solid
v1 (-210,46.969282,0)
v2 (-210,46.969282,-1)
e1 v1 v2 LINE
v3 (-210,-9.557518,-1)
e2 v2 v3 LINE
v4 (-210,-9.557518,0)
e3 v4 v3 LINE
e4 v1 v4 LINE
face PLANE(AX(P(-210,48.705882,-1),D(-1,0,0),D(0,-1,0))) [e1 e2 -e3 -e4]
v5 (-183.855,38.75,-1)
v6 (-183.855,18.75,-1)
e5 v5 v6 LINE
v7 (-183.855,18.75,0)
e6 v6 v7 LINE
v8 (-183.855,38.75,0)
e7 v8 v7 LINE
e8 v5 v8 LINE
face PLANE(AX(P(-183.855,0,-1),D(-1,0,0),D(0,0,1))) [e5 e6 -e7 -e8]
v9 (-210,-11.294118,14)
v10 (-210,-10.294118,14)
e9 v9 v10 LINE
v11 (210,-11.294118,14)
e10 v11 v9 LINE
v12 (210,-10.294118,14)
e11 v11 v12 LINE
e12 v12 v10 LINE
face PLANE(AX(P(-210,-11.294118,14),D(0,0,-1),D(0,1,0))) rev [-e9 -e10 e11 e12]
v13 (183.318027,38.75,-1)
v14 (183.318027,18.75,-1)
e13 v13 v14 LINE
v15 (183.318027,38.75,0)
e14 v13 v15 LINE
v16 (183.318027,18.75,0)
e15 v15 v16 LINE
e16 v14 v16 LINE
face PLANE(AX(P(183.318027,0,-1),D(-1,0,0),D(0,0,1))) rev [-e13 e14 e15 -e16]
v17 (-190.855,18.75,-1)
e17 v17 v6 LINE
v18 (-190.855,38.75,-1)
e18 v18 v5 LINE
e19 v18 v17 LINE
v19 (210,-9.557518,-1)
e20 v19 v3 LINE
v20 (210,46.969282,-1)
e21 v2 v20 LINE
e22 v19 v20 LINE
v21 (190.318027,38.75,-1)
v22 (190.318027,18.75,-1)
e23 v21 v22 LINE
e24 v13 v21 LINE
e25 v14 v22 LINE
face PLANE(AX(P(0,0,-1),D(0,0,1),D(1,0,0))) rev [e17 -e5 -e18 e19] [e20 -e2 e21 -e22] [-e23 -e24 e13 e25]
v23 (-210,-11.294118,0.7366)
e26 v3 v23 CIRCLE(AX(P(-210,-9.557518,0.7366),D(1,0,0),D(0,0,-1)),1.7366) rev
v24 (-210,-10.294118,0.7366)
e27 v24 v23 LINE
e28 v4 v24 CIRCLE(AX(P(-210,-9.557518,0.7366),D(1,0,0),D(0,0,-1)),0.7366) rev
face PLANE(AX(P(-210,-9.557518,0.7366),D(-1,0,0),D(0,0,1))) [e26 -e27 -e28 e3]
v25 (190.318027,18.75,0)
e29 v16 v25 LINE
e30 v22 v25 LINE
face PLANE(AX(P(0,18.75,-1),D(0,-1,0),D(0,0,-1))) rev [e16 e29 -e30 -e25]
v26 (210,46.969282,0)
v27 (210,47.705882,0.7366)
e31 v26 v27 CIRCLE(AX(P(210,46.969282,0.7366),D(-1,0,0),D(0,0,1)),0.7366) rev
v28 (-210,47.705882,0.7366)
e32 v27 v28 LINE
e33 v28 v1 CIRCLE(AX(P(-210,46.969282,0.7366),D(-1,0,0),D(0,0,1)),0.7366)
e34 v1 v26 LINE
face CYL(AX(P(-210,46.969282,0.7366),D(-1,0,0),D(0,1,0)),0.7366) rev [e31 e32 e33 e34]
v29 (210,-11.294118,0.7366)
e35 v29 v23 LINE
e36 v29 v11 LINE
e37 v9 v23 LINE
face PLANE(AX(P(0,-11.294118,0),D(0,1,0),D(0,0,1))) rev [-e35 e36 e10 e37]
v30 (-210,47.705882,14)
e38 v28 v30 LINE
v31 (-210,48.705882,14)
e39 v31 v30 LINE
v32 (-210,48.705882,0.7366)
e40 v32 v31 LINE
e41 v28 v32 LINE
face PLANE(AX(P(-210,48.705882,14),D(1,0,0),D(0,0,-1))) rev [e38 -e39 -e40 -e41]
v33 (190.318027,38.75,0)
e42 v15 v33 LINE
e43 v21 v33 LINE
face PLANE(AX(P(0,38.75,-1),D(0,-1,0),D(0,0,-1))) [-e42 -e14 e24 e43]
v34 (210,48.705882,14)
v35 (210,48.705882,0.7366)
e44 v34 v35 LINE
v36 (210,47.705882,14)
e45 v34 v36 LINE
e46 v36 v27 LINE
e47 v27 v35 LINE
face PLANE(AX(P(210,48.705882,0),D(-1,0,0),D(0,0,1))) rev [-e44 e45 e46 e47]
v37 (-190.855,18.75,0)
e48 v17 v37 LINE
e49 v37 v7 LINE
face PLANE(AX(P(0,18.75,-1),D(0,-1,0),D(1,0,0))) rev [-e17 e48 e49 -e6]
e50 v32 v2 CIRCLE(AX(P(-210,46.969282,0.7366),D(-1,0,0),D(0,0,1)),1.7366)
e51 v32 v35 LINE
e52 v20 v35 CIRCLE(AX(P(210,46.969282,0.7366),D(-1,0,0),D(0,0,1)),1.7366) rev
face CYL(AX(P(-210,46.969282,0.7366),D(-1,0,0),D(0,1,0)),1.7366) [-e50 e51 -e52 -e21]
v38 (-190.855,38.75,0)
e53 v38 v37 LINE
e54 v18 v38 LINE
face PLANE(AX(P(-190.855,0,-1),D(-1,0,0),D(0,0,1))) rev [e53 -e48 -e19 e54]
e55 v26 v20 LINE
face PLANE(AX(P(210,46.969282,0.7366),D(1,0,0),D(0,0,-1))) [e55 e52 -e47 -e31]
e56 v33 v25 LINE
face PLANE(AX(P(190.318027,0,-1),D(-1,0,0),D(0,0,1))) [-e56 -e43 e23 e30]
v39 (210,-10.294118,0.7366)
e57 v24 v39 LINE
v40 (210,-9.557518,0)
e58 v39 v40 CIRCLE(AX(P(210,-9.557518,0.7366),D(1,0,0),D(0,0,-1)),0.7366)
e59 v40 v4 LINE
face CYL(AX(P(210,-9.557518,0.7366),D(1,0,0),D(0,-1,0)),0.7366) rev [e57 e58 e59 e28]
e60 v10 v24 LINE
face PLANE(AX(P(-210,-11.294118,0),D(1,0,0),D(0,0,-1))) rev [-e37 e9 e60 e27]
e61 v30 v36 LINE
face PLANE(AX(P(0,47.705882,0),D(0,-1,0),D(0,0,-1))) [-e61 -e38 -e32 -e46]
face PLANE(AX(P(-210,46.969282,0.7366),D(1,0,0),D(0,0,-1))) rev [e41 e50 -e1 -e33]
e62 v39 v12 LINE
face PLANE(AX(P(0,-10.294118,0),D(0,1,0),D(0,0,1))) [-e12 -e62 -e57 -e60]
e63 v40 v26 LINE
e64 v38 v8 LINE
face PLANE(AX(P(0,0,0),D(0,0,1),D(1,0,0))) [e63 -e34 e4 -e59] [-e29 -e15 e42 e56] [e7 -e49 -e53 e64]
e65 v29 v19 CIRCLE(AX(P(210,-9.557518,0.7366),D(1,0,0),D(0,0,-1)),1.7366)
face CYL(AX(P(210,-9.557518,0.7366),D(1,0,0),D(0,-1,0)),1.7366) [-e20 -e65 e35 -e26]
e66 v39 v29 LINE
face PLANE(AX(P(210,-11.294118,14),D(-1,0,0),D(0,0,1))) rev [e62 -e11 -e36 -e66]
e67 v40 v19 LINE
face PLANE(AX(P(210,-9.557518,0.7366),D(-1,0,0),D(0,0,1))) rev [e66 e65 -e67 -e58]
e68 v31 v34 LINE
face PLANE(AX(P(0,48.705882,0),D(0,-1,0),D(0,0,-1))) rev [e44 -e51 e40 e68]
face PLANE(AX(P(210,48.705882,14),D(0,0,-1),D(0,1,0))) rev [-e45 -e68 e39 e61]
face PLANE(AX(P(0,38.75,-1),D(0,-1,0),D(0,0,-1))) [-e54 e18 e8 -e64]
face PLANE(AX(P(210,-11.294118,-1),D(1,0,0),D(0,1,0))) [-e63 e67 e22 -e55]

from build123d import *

# Parameters (mm, degrees)
SKETCH1_W                    = 420
SKETCH1_H                    = 60
BASE_FLANGE1_DEPTH           = 1
EDGE_FLANGE1_STRIP_W         = 5.4732
EDGE_FLANGE1_STRIP_H         = 1
EDGE_FLANGE1_STRIP_CUT_DEPTH = 420
EDGE_FLANGE1_DEPTH           = 420
EDGE_FLANGE2_STRIP_W         = 5.4732
EDGE_FLANGE2_STRIP_H         = 1
EDGE_FLANGE2_STRIP_CUT_DEPTH = 420
EDGE_FLANGE2_DEPTH           = 420
SKETCH12_W                   = 7
SKETCH12_H                   = 20
CUT_EXTRUDE1_DEPTH           = 217.028384653


# Sheet-metal steps are written as plain solids
with BuildPart() as part:
    # Sketch1 → Base-Flange1 (new body)
    with BuildSketch(Plane.XY):
        with Locations((0, 18.705882353)):
            Rectangle(SKETCH1_W, SKETCH1_H)
    extrude(amount=-BASE_FLANGE1_DEPTH)

    # Edge-Flange1 strip (across the edge) → Edge-Flange1 strip cut (cut)
    with BuildSketch(Plane(origin=(210, 48.705882353, 0), x_dir=(0, -1, 0), z_dir=(-1, 0, 0))):
        with Locations((-1, -0.5)):
            Rectangle(EDGE_FLANGE1_STRIP_W, EDGE_FLANGE1_STRIP_H)
    extrude(amount=EDGE_FLANGE1_STRIP_CUT_DEPTH, mode=Mode.SUBTRACT)

    # Edge-Flange1 section (across the edge) → Edge-Flange1 (add)
    with BuildSketch(Plane(origin=(210, 48.705882353, 0), x_dir=(0, -1, 0), z_dir=(-1, 0, 0))):
        with BuildLine():
            Line((0, 0.7366), (0, 14))
            Line((0, 14), (1, 14))
            Line((1, 14), (1, 0.7366))
            ThreePointArc((1, 0.7366), (1.215745145, 0.215745145), (1.7366, 0))
            Line((1.7366, 0), (1.7366, -1))
            ThreePointArc((1.7366, -1), (0.508638364, -0.491361636), (0, 0.7366))
        make_face()
    extrude(amount=EDGE_FLANGE1_DEPTH)

    # Edge-Flange2 strip (across the edge) → Edge-Flange2 strip cut (cut)
    with BuildSketch(Plane(origin=(-210, -11.294117647, 0), x_dir=(0, 1, 0), z_dir=(1, 0, 0))):
        with Locations((-1, -0.5)):
            Rectangle(EDGE_FLANGE2_STRIP_W, EDGE_FLANGE2_STRIP_H)
    extrude(amount=EDGE_FLANGE2_STRIP_CUT_DEPTH, mode=Mode.SUBTRACT)

    # Edge-Flange2 section (across the edge) → Edge-Flange2 (add)
    with BuildSketch(Plane(origin=(-210, -11.294117647, 0), x_dir=(0, 1, 0), z_dir=(1, 0, 0))):
        with BuildLine():
            Line((0, 0.7366), (0, 14))
            Line((0, 14), (1, 14))
            Line((1, 14), (1, 0.7366))
            ThreePointArc((1, 0.7366), (1.215745145, 0.215745145), (1.7366, 0))
            Line((1.7366, 0), (1.7366, -1))
            ThreePointArc((1.7366, -1), (0.508638364, -0.491361636), (0, 0.7366))
        make_face()
    extrude(amount=EDGE_FLANGE2_DEPTH)

    # Sketch12 → Cut-Extrude1 (cut, through all)
    with BuildSketch(Plane.XY):
        with Locations((186.818027369, 28.75)):
            Rectangle(SKETCH12_W, SKETCH12_H)
        with Locations((-187.355, 28.75)):
            Rectangle(SKETCH12_W, SKETCH12_H)
    extrude(amount=-CUT_EXTRUDE1_DEPTH, mode=Mode.SUBTRACT)


solid = part.part
